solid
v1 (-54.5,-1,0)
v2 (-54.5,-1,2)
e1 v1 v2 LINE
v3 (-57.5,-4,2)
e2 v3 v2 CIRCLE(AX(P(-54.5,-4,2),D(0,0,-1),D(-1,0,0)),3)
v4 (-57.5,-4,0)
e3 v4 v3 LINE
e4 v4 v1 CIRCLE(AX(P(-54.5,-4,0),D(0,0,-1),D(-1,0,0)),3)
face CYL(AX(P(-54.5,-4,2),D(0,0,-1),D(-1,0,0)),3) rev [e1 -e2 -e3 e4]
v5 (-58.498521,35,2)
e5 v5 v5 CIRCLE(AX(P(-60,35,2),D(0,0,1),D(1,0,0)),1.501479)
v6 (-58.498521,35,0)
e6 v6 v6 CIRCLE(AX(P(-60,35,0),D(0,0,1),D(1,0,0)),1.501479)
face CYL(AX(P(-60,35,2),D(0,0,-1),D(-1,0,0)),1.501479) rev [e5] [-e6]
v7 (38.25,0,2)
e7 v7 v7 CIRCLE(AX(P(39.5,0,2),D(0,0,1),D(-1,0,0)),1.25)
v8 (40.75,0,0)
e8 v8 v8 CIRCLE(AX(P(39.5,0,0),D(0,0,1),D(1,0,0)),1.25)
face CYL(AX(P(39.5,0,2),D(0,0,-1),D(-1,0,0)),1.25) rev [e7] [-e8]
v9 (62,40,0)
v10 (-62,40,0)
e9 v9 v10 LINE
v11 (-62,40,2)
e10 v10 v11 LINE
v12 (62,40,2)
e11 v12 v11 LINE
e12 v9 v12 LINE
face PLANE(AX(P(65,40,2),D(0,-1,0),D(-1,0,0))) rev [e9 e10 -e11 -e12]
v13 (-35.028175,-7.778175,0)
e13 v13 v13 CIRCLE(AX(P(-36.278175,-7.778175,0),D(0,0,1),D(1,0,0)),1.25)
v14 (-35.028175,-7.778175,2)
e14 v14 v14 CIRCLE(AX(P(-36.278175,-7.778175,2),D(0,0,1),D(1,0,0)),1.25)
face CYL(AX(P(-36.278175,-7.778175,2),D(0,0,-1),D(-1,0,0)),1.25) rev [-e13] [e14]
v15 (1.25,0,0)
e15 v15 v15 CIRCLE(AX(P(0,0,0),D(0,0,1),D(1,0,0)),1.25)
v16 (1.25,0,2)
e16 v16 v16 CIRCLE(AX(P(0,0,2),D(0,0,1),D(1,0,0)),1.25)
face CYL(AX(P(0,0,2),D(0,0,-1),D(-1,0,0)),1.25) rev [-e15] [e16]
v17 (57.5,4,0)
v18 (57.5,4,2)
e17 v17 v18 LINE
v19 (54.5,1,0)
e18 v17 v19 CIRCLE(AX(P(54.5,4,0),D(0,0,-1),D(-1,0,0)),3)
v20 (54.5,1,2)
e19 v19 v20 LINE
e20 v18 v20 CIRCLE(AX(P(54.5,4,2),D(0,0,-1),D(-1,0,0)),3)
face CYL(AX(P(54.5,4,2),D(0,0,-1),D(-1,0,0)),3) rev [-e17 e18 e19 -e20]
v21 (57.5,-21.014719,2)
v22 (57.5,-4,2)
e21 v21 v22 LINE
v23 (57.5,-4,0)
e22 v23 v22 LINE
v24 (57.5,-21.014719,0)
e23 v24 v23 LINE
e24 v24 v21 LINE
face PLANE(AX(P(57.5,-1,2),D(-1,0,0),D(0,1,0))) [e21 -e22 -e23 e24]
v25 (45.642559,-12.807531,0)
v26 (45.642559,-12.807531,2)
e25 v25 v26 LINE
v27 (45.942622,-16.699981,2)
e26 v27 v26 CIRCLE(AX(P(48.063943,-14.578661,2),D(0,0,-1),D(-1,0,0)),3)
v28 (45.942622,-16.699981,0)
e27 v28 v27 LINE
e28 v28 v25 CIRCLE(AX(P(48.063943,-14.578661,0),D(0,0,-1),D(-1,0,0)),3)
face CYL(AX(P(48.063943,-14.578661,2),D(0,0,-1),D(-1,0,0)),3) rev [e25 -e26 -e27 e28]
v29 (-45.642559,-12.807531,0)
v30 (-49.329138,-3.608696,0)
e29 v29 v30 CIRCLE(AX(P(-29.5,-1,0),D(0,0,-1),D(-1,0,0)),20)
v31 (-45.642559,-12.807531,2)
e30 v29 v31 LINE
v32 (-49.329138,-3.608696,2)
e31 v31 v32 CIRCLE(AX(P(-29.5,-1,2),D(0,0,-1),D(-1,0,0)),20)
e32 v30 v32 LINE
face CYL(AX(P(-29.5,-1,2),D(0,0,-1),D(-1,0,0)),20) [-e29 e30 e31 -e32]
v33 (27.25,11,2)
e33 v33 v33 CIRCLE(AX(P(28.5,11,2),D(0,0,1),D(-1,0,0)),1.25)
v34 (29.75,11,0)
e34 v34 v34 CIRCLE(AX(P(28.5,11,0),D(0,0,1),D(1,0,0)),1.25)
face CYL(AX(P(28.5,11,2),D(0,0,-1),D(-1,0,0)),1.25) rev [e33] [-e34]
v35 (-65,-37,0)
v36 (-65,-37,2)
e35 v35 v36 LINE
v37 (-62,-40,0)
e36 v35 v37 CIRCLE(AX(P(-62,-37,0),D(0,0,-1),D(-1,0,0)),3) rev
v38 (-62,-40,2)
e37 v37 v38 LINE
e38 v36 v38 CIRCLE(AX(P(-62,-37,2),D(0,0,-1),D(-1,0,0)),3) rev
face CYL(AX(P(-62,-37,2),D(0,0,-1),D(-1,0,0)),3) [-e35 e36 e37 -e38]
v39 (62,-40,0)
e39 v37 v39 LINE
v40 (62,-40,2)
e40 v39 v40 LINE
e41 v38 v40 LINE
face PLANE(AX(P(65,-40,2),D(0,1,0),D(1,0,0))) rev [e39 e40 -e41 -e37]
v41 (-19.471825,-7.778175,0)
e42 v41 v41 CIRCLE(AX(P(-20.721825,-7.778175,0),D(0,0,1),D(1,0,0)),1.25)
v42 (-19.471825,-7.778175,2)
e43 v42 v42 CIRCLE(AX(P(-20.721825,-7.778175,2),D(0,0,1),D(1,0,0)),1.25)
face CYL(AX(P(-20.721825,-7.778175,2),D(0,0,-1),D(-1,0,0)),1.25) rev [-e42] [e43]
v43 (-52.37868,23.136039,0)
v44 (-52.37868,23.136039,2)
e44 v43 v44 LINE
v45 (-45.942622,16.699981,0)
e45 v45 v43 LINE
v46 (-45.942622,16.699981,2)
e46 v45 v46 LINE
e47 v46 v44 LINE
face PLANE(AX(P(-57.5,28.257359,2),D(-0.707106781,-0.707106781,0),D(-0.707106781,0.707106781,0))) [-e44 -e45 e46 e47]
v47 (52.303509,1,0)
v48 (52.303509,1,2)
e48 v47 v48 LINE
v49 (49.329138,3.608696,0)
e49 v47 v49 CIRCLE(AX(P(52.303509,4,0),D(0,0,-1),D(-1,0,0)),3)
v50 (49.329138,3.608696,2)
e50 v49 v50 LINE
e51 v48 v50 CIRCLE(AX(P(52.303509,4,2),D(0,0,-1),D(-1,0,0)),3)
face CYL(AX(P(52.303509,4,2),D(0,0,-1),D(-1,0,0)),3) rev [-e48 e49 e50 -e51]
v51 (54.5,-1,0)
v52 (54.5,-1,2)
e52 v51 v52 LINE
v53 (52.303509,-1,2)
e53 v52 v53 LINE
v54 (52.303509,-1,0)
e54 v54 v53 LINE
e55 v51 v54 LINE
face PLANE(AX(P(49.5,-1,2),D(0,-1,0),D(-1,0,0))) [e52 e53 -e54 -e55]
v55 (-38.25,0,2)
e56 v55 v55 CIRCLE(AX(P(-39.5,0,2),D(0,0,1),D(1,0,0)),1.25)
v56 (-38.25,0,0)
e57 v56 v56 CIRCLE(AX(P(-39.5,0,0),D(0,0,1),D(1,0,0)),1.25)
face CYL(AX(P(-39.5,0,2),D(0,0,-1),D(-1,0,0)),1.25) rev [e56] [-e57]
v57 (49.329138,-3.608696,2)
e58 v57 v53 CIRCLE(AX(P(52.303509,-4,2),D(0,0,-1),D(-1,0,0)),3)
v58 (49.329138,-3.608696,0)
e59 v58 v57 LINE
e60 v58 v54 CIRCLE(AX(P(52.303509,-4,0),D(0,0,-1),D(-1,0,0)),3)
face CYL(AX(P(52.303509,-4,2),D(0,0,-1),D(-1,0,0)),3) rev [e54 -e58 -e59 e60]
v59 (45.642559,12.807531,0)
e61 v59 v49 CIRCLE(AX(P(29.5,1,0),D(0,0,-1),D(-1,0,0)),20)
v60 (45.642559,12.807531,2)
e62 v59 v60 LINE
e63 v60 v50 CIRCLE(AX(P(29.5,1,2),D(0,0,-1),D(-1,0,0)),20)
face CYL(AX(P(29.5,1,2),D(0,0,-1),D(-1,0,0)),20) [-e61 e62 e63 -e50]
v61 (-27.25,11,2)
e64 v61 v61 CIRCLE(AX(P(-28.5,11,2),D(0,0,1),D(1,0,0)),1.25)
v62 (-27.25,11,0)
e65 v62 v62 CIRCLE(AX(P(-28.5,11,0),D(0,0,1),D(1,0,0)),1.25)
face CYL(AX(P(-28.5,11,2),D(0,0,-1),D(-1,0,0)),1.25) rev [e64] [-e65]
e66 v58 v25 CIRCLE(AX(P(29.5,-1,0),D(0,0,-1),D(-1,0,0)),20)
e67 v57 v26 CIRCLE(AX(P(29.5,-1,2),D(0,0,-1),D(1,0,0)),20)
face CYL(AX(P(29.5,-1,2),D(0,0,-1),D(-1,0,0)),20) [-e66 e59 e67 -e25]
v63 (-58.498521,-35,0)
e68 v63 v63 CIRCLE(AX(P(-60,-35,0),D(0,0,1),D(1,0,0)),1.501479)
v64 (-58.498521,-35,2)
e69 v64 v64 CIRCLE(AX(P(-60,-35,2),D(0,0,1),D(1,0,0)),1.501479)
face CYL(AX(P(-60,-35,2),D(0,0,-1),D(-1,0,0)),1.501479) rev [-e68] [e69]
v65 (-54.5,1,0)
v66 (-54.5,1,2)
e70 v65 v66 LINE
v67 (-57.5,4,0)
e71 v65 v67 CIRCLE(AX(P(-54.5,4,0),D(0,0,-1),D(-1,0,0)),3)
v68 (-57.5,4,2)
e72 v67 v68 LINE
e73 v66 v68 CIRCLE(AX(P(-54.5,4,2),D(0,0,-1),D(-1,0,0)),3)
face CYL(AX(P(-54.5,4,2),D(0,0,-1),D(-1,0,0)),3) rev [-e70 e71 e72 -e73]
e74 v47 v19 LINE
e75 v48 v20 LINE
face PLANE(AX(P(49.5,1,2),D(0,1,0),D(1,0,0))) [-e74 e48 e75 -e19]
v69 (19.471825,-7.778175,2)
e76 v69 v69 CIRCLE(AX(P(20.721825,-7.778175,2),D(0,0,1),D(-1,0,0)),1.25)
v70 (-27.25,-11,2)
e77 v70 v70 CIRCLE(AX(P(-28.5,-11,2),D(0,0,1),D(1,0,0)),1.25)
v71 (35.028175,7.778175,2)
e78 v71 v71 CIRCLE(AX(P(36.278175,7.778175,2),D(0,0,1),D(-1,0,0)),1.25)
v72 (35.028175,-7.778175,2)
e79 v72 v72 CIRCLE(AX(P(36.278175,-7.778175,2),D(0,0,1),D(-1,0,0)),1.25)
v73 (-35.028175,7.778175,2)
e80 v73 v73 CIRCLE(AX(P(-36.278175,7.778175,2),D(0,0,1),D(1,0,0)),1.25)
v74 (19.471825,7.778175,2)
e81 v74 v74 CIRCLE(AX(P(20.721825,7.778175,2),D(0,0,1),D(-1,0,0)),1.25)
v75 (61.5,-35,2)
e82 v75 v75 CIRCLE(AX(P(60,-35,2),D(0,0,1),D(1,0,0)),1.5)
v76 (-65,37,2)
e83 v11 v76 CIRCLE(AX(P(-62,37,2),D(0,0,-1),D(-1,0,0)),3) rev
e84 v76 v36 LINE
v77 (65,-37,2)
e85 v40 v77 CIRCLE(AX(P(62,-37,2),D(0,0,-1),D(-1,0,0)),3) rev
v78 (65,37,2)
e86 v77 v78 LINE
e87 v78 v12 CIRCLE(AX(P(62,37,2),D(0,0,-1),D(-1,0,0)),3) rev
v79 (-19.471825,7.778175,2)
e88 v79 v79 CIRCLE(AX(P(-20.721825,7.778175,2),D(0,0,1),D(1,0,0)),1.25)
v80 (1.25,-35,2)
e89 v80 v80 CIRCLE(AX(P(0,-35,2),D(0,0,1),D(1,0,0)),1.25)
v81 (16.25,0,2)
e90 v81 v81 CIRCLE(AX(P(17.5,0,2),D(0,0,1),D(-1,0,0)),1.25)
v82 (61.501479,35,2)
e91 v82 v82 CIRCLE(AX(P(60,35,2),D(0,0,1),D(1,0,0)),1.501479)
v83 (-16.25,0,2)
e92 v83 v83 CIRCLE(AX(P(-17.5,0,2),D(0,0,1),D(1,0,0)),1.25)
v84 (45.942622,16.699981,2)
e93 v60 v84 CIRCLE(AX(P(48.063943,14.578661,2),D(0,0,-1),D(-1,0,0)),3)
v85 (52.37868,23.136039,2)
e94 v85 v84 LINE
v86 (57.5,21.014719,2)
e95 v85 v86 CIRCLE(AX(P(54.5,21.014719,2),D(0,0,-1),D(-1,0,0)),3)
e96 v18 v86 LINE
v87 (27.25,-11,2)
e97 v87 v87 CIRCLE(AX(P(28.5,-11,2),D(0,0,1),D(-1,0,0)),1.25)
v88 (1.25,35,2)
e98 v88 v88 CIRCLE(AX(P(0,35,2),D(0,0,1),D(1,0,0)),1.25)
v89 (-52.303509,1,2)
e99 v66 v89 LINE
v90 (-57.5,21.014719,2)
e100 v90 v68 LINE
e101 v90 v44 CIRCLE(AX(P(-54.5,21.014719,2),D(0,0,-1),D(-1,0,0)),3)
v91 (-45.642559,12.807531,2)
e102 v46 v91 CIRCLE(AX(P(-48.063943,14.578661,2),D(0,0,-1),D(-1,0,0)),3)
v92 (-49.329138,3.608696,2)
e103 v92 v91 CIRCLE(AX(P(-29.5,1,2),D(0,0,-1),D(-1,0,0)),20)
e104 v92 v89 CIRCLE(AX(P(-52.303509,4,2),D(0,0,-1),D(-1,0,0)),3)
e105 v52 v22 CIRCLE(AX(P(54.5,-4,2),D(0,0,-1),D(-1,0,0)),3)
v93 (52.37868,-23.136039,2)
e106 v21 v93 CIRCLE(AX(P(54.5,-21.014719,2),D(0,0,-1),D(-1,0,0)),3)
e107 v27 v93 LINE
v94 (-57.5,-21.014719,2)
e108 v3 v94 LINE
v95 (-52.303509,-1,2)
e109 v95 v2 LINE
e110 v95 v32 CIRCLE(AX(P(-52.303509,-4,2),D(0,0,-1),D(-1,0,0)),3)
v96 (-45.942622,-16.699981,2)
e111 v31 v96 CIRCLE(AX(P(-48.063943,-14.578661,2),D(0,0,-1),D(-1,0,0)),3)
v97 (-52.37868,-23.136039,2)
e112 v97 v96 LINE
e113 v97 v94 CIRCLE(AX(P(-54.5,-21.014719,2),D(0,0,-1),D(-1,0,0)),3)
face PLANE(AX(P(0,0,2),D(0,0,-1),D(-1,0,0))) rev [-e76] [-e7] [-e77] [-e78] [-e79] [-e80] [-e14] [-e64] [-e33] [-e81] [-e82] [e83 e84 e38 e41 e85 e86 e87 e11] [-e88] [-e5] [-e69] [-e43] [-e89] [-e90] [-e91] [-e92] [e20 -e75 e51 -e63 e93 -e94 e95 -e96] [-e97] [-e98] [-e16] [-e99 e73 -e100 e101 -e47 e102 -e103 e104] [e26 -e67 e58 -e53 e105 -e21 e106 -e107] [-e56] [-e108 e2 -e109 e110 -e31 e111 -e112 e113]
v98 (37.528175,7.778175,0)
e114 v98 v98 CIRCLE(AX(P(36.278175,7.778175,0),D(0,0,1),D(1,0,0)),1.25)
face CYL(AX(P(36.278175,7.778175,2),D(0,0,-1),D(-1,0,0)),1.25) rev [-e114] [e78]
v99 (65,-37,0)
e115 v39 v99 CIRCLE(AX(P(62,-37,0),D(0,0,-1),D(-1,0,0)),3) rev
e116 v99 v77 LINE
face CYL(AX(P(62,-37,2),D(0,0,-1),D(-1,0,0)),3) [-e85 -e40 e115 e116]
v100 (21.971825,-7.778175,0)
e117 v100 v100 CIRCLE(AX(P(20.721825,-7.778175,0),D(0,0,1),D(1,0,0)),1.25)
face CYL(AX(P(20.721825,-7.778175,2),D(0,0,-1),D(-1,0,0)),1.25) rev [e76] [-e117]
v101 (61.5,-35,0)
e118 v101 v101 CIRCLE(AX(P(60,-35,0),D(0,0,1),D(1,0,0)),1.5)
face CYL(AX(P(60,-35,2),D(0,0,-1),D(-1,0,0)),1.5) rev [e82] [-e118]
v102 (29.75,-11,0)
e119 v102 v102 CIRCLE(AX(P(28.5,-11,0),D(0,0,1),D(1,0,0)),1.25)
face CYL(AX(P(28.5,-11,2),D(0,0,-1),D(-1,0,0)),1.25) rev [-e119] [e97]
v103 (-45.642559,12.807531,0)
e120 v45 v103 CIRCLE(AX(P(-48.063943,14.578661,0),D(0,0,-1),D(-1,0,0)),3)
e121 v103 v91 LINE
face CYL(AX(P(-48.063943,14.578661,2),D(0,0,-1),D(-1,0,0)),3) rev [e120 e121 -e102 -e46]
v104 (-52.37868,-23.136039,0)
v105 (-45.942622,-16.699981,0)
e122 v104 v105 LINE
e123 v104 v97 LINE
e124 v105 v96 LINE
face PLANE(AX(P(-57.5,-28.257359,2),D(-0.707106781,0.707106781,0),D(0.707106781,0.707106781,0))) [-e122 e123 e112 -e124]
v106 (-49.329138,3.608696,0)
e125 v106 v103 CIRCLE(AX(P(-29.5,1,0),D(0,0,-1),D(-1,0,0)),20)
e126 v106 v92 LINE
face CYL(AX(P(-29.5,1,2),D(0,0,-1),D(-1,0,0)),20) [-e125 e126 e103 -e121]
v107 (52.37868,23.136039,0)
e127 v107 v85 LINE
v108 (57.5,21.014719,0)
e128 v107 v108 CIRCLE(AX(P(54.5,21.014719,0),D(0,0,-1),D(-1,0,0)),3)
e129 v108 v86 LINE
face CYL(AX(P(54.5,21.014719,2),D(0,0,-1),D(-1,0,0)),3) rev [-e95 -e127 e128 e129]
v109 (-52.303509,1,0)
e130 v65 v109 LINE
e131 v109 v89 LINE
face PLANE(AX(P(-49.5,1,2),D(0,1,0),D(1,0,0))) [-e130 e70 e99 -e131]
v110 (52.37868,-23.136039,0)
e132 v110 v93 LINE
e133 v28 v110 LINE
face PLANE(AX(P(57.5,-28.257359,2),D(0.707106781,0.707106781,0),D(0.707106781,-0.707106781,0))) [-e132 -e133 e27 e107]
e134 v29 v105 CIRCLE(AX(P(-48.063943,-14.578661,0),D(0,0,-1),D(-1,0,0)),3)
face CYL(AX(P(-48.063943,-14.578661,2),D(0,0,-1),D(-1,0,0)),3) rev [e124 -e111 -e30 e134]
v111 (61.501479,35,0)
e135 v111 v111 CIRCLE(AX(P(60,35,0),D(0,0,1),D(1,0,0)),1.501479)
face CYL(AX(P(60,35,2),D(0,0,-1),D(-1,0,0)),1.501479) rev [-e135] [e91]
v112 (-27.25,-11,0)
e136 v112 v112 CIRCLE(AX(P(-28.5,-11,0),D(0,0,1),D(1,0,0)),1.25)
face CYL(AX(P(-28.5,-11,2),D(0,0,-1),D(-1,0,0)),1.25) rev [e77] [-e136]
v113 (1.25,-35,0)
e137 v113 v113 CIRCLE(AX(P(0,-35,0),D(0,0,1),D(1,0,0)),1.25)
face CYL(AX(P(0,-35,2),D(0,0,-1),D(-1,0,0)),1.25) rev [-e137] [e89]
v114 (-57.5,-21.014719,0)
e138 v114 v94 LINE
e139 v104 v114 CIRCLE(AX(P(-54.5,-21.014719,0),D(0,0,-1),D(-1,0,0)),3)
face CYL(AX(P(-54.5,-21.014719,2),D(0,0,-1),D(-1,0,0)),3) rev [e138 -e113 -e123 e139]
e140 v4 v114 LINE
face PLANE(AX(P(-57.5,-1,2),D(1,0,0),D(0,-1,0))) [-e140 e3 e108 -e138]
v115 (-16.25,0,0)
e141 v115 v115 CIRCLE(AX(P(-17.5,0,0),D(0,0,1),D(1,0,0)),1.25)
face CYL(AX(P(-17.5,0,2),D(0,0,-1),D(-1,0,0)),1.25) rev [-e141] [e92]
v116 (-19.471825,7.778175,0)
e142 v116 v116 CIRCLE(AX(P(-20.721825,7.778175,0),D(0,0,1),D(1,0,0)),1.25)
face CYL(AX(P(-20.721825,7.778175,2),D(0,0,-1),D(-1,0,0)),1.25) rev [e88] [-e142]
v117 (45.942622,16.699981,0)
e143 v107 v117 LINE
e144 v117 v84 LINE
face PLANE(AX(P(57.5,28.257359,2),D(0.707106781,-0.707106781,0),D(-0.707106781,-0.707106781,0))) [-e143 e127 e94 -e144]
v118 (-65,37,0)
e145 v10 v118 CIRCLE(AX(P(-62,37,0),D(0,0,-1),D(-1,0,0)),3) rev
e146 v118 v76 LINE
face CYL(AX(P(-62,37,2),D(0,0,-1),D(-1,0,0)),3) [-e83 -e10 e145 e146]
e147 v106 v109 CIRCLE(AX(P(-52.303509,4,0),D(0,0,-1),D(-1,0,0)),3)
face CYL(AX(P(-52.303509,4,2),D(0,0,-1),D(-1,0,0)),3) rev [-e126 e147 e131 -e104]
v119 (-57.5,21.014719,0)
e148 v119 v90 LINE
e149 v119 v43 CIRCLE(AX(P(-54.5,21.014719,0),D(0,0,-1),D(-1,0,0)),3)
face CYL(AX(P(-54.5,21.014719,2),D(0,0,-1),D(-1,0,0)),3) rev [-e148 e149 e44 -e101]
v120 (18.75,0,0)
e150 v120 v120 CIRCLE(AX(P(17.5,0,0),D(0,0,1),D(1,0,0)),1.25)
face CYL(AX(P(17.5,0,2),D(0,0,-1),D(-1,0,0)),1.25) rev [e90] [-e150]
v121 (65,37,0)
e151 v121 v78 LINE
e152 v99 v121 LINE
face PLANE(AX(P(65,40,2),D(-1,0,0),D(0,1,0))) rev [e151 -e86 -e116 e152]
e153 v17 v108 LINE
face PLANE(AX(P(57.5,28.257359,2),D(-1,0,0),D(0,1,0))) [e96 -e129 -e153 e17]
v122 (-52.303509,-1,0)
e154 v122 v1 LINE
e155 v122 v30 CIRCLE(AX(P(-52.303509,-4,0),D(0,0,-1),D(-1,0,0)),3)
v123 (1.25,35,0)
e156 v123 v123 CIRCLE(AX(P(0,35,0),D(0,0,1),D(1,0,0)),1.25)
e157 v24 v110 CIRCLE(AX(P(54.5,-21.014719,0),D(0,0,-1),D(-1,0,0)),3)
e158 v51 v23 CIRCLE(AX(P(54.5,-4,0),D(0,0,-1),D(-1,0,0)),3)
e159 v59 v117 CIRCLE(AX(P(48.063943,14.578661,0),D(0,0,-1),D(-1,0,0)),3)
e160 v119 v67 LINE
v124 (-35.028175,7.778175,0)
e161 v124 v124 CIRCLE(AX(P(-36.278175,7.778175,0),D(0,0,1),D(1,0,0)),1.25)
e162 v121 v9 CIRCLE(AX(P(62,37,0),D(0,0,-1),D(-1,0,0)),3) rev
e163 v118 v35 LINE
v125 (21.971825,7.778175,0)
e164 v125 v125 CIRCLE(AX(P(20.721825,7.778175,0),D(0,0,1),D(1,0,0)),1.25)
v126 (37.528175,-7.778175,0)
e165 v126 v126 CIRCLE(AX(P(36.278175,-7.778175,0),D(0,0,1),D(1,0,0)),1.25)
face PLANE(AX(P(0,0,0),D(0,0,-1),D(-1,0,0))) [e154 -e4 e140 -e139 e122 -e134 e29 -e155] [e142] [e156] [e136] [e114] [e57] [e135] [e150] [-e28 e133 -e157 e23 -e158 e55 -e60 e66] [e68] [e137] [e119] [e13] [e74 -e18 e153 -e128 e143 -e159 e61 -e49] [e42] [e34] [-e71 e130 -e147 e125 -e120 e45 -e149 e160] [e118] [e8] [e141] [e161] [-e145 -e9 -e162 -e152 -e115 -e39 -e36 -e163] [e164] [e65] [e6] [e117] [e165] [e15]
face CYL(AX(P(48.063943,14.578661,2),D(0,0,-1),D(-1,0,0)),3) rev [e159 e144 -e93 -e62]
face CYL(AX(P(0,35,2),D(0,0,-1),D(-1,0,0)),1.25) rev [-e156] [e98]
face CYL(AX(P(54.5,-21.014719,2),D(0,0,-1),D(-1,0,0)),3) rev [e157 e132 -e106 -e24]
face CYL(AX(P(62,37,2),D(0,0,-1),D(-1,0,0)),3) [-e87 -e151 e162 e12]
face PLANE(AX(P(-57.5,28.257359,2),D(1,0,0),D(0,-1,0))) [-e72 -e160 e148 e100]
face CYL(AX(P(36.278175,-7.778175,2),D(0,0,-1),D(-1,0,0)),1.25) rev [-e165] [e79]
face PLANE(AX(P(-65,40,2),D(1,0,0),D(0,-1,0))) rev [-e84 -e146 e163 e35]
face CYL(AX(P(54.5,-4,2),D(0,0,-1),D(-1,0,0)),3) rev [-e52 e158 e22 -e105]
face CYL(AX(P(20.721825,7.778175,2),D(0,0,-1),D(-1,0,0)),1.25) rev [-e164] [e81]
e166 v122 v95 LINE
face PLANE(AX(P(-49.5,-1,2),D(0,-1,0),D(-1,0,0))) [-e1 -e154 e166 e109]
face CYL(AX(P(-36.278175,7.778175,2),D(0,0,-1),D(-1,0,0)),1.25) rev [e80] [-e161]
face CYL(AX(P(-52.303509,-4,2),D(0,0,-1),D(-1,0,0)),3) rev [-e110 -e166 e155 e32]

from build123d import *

# Parameters (mm, degrees)
ESBO_O1_W                = 130
ESBO_O1_H                = 80
ESBO_O1_R                = 1.25
ESBO_O1_R_2              = 1.501478649
ESBO_O1_R_3              = 1.5
RESSALTO_EXTRUS_O1_DEPTH = 2
FILETE1_R                = 3
FILETE2_R                = 3


with BuildPart() as part:
    # Esboço1 → Ressalto-extrusão1 (new body)
    with BuildSketch(Plane.XY):
        Rectangle(ESBO_O1_W, ESBO_O1_H)
        with Locations((-39.5, 0)):
            Circle(ESBO_O1_R, mode=Mode.SUBTRACT)
        with Locations((-36.278174593, 7.778174593)):
            Circle(ESBO_O1_R, mode=Mode.SUBTRACT)
        with Locations((-28.5, 11)):
            Circle(ESBO_O1_R, mode=Mode.SUBTRACT)
        with Locations((-20.721825407, 7.778174593)):
            Circle(ESBO_O1_R, mode=Mode.SUBTRACT)
        with Locations((-17.5, 0)):
            Circle(ESBO_O1_R, mode=Mode.SUBTRACT)
        with Locations((-20.721825407, -7.778174593)):
            Circle(ESBO_O1_R, mode=Mode.SUBTRACT)
        with Locations((-28.5, -11)):
            Circle(ESBO_O1_R, mode=Mode.SUBTRACT)
        with Locations((-36.278174593, -7.778174593)):
            Circle(ESBO_O1_R, mode=Mode.SUBTRACT)
        with Locations(Location((39.5, 0, 0), (0, 0, 180))):
            Circle(ESBO_O1_R, mode=Mode.SUBTRACT)
        with Locations(Location((36.278174593, -7.778174593, 0), (0, 0, 180))):
            Circle(ESBO_O1_R, mode=Mode.SUBTRACT)
        with Locations(Location((28.5, -11, 0), (0, 0, 180))):
            Circle(ESBO_O1_R, mode=Mode.SUBTRACT)
        with Locations(Location((20.721825407, -7.778174593, 0), (0, 0, 180))):
            Circle(ESBO_O1_R, mode=Mode.SUBTRACT)
        with Locations(Location((17.5, 0, 0), (0, 0, 180))):
            Circle(ESBO_O1_R, mode=Mode.SUBTRACT)
        with Locations(Location((20.721825407, 7.778174593, 0), (0, 0, 180))):
            Circle(ESBO_O1_R, mode=Mode.SUBTRACT)
        with Locations(Location((28.5, 11, 0), (0, 0, 180))):
            Circle(ESBO_O1_R, mode=Mode.SUBTRACT)
        with Locations(Location((36.278174593, 7.778174593, 0), (0, 0, 180))):
            Circle(ESBO_O1_R, mode=Mode.SUBTRACT)
        with Locations((-60, 35)):
            Circle(ESBO_O1_R_2, mode=Mode.SUBTRACT)
        with Locations((-60, -35)):
            Circle(ESBO_O1_R_2, mode=Mode.SUBTRACT)
        with Locations((60, 35)):
            Circle(ESBO_O1_R_2, mode=Mode.SUBTRACT)
        with Locations((60, -35)):
            Circle(ESBO_O1_R_3, mode=Mode.SUBTRACT)
        Circle(ESBO_O1_R, mode=Mode.SUBTRACT)
        with Locations((0, 35)):
            Circle(ESBO_O1_R, mode=Mode.SUBTRACT)
        with Locations((0, -35)):
            Circle(ESBO_O1_R, mode=Mode.SUBTRACT)
        with BuildLine():
            Line((-57.5, 28.257359313), (-44.008580375, 14.765939688))
            ThreePointArc((-44.008580375, 14.765939688), (-48.076485237, 8.410411341), (-49.5, 1))
            Line((-49.5, 1), (-57.5, 1))
            Line((-57.5, 1), (-57.5, 28.257359313))
        make_face(mode=Mode.SUBTRACT)
        with BuildLine():
            Line((57.5, 28.257359313), (44.008580375, 14.765939688))
            ThreePointArc((44.008580375, 14.765939688), (48.076485237, 8.410411341), (49.5, 1))
            Line((49.5, 1), (57.5, 1))
            Line((57.5, 1), (57.5, 28.257359313))
        make_face(mode=Mode.SUBTRACT)
        with BuildLine():
            Line((57.5, -28.257359313), (44.008580375, -14.765939688))
            ThreePointArc((44.008580375, -14.765939688), (48.076485237, -8.410411341), (49.5, -1))
            Line((49.5, -1), (57.5, -1))
            Line((57.5, -1), (57.5, -28.257359313))
        make_face(mode=Mode.SUBTRACT)
        with BuildLine():
            Line((-57.5, -28.257359313), (-44.008580375, -14.765939688))
            ThreePointArc((-44.008580375, -14.765939688), (-48.076485237, -8.410411341), (-49.5, -1))
            Line((-49.5, -1), (-57.5, -1))
            Line((-57.5, -1), (-57.5, -28.257359313))
        make_face(mode=Mode.SUBTRACT)
    extrude(amount=RESSALTO_EXTRUS_O1_DEPTH)

    # Filete1
    filete1_edges = [part.edges().sort_by_distance(p)[0] for p in [
        (44.008580375, 14.765939688, 1),
        (49.5, 1, 1),
        (57.5, 1, 1),
        (57.5, 28.257359313, 1),
        (49.5, -1, 1),
        (44.008580375, -14.765939688, 1),
        (57.5, -28.257359313, 1),
        (57.5, -1, 1),
        (-44.008580375, -14.765939688, 1),
        (-49.5, -1, 1),
        (-57.5, -1, 1),
        (-57.5, -28.257359313, 1),
        (-49.5, 1, 1),
        (-44.008580375, 14.765939688, 1),
        (-57.5, 28.257359313, 1),
        (-57.5, 1, 1),
    ]]
    fillet(filete1_edges, radius=FILETE1_R)

    # Filete2
    filete2_edges = [part.edges().sort_by_distance(p)[0] for p in [
        (65, -40, 1),
        (-65, -40, 1),
        (-65, 40, 1),
        (65, 40, 1),
    ]]
    fillet(filete2_edges, radius=FILETE2_R)


solid = part.part
